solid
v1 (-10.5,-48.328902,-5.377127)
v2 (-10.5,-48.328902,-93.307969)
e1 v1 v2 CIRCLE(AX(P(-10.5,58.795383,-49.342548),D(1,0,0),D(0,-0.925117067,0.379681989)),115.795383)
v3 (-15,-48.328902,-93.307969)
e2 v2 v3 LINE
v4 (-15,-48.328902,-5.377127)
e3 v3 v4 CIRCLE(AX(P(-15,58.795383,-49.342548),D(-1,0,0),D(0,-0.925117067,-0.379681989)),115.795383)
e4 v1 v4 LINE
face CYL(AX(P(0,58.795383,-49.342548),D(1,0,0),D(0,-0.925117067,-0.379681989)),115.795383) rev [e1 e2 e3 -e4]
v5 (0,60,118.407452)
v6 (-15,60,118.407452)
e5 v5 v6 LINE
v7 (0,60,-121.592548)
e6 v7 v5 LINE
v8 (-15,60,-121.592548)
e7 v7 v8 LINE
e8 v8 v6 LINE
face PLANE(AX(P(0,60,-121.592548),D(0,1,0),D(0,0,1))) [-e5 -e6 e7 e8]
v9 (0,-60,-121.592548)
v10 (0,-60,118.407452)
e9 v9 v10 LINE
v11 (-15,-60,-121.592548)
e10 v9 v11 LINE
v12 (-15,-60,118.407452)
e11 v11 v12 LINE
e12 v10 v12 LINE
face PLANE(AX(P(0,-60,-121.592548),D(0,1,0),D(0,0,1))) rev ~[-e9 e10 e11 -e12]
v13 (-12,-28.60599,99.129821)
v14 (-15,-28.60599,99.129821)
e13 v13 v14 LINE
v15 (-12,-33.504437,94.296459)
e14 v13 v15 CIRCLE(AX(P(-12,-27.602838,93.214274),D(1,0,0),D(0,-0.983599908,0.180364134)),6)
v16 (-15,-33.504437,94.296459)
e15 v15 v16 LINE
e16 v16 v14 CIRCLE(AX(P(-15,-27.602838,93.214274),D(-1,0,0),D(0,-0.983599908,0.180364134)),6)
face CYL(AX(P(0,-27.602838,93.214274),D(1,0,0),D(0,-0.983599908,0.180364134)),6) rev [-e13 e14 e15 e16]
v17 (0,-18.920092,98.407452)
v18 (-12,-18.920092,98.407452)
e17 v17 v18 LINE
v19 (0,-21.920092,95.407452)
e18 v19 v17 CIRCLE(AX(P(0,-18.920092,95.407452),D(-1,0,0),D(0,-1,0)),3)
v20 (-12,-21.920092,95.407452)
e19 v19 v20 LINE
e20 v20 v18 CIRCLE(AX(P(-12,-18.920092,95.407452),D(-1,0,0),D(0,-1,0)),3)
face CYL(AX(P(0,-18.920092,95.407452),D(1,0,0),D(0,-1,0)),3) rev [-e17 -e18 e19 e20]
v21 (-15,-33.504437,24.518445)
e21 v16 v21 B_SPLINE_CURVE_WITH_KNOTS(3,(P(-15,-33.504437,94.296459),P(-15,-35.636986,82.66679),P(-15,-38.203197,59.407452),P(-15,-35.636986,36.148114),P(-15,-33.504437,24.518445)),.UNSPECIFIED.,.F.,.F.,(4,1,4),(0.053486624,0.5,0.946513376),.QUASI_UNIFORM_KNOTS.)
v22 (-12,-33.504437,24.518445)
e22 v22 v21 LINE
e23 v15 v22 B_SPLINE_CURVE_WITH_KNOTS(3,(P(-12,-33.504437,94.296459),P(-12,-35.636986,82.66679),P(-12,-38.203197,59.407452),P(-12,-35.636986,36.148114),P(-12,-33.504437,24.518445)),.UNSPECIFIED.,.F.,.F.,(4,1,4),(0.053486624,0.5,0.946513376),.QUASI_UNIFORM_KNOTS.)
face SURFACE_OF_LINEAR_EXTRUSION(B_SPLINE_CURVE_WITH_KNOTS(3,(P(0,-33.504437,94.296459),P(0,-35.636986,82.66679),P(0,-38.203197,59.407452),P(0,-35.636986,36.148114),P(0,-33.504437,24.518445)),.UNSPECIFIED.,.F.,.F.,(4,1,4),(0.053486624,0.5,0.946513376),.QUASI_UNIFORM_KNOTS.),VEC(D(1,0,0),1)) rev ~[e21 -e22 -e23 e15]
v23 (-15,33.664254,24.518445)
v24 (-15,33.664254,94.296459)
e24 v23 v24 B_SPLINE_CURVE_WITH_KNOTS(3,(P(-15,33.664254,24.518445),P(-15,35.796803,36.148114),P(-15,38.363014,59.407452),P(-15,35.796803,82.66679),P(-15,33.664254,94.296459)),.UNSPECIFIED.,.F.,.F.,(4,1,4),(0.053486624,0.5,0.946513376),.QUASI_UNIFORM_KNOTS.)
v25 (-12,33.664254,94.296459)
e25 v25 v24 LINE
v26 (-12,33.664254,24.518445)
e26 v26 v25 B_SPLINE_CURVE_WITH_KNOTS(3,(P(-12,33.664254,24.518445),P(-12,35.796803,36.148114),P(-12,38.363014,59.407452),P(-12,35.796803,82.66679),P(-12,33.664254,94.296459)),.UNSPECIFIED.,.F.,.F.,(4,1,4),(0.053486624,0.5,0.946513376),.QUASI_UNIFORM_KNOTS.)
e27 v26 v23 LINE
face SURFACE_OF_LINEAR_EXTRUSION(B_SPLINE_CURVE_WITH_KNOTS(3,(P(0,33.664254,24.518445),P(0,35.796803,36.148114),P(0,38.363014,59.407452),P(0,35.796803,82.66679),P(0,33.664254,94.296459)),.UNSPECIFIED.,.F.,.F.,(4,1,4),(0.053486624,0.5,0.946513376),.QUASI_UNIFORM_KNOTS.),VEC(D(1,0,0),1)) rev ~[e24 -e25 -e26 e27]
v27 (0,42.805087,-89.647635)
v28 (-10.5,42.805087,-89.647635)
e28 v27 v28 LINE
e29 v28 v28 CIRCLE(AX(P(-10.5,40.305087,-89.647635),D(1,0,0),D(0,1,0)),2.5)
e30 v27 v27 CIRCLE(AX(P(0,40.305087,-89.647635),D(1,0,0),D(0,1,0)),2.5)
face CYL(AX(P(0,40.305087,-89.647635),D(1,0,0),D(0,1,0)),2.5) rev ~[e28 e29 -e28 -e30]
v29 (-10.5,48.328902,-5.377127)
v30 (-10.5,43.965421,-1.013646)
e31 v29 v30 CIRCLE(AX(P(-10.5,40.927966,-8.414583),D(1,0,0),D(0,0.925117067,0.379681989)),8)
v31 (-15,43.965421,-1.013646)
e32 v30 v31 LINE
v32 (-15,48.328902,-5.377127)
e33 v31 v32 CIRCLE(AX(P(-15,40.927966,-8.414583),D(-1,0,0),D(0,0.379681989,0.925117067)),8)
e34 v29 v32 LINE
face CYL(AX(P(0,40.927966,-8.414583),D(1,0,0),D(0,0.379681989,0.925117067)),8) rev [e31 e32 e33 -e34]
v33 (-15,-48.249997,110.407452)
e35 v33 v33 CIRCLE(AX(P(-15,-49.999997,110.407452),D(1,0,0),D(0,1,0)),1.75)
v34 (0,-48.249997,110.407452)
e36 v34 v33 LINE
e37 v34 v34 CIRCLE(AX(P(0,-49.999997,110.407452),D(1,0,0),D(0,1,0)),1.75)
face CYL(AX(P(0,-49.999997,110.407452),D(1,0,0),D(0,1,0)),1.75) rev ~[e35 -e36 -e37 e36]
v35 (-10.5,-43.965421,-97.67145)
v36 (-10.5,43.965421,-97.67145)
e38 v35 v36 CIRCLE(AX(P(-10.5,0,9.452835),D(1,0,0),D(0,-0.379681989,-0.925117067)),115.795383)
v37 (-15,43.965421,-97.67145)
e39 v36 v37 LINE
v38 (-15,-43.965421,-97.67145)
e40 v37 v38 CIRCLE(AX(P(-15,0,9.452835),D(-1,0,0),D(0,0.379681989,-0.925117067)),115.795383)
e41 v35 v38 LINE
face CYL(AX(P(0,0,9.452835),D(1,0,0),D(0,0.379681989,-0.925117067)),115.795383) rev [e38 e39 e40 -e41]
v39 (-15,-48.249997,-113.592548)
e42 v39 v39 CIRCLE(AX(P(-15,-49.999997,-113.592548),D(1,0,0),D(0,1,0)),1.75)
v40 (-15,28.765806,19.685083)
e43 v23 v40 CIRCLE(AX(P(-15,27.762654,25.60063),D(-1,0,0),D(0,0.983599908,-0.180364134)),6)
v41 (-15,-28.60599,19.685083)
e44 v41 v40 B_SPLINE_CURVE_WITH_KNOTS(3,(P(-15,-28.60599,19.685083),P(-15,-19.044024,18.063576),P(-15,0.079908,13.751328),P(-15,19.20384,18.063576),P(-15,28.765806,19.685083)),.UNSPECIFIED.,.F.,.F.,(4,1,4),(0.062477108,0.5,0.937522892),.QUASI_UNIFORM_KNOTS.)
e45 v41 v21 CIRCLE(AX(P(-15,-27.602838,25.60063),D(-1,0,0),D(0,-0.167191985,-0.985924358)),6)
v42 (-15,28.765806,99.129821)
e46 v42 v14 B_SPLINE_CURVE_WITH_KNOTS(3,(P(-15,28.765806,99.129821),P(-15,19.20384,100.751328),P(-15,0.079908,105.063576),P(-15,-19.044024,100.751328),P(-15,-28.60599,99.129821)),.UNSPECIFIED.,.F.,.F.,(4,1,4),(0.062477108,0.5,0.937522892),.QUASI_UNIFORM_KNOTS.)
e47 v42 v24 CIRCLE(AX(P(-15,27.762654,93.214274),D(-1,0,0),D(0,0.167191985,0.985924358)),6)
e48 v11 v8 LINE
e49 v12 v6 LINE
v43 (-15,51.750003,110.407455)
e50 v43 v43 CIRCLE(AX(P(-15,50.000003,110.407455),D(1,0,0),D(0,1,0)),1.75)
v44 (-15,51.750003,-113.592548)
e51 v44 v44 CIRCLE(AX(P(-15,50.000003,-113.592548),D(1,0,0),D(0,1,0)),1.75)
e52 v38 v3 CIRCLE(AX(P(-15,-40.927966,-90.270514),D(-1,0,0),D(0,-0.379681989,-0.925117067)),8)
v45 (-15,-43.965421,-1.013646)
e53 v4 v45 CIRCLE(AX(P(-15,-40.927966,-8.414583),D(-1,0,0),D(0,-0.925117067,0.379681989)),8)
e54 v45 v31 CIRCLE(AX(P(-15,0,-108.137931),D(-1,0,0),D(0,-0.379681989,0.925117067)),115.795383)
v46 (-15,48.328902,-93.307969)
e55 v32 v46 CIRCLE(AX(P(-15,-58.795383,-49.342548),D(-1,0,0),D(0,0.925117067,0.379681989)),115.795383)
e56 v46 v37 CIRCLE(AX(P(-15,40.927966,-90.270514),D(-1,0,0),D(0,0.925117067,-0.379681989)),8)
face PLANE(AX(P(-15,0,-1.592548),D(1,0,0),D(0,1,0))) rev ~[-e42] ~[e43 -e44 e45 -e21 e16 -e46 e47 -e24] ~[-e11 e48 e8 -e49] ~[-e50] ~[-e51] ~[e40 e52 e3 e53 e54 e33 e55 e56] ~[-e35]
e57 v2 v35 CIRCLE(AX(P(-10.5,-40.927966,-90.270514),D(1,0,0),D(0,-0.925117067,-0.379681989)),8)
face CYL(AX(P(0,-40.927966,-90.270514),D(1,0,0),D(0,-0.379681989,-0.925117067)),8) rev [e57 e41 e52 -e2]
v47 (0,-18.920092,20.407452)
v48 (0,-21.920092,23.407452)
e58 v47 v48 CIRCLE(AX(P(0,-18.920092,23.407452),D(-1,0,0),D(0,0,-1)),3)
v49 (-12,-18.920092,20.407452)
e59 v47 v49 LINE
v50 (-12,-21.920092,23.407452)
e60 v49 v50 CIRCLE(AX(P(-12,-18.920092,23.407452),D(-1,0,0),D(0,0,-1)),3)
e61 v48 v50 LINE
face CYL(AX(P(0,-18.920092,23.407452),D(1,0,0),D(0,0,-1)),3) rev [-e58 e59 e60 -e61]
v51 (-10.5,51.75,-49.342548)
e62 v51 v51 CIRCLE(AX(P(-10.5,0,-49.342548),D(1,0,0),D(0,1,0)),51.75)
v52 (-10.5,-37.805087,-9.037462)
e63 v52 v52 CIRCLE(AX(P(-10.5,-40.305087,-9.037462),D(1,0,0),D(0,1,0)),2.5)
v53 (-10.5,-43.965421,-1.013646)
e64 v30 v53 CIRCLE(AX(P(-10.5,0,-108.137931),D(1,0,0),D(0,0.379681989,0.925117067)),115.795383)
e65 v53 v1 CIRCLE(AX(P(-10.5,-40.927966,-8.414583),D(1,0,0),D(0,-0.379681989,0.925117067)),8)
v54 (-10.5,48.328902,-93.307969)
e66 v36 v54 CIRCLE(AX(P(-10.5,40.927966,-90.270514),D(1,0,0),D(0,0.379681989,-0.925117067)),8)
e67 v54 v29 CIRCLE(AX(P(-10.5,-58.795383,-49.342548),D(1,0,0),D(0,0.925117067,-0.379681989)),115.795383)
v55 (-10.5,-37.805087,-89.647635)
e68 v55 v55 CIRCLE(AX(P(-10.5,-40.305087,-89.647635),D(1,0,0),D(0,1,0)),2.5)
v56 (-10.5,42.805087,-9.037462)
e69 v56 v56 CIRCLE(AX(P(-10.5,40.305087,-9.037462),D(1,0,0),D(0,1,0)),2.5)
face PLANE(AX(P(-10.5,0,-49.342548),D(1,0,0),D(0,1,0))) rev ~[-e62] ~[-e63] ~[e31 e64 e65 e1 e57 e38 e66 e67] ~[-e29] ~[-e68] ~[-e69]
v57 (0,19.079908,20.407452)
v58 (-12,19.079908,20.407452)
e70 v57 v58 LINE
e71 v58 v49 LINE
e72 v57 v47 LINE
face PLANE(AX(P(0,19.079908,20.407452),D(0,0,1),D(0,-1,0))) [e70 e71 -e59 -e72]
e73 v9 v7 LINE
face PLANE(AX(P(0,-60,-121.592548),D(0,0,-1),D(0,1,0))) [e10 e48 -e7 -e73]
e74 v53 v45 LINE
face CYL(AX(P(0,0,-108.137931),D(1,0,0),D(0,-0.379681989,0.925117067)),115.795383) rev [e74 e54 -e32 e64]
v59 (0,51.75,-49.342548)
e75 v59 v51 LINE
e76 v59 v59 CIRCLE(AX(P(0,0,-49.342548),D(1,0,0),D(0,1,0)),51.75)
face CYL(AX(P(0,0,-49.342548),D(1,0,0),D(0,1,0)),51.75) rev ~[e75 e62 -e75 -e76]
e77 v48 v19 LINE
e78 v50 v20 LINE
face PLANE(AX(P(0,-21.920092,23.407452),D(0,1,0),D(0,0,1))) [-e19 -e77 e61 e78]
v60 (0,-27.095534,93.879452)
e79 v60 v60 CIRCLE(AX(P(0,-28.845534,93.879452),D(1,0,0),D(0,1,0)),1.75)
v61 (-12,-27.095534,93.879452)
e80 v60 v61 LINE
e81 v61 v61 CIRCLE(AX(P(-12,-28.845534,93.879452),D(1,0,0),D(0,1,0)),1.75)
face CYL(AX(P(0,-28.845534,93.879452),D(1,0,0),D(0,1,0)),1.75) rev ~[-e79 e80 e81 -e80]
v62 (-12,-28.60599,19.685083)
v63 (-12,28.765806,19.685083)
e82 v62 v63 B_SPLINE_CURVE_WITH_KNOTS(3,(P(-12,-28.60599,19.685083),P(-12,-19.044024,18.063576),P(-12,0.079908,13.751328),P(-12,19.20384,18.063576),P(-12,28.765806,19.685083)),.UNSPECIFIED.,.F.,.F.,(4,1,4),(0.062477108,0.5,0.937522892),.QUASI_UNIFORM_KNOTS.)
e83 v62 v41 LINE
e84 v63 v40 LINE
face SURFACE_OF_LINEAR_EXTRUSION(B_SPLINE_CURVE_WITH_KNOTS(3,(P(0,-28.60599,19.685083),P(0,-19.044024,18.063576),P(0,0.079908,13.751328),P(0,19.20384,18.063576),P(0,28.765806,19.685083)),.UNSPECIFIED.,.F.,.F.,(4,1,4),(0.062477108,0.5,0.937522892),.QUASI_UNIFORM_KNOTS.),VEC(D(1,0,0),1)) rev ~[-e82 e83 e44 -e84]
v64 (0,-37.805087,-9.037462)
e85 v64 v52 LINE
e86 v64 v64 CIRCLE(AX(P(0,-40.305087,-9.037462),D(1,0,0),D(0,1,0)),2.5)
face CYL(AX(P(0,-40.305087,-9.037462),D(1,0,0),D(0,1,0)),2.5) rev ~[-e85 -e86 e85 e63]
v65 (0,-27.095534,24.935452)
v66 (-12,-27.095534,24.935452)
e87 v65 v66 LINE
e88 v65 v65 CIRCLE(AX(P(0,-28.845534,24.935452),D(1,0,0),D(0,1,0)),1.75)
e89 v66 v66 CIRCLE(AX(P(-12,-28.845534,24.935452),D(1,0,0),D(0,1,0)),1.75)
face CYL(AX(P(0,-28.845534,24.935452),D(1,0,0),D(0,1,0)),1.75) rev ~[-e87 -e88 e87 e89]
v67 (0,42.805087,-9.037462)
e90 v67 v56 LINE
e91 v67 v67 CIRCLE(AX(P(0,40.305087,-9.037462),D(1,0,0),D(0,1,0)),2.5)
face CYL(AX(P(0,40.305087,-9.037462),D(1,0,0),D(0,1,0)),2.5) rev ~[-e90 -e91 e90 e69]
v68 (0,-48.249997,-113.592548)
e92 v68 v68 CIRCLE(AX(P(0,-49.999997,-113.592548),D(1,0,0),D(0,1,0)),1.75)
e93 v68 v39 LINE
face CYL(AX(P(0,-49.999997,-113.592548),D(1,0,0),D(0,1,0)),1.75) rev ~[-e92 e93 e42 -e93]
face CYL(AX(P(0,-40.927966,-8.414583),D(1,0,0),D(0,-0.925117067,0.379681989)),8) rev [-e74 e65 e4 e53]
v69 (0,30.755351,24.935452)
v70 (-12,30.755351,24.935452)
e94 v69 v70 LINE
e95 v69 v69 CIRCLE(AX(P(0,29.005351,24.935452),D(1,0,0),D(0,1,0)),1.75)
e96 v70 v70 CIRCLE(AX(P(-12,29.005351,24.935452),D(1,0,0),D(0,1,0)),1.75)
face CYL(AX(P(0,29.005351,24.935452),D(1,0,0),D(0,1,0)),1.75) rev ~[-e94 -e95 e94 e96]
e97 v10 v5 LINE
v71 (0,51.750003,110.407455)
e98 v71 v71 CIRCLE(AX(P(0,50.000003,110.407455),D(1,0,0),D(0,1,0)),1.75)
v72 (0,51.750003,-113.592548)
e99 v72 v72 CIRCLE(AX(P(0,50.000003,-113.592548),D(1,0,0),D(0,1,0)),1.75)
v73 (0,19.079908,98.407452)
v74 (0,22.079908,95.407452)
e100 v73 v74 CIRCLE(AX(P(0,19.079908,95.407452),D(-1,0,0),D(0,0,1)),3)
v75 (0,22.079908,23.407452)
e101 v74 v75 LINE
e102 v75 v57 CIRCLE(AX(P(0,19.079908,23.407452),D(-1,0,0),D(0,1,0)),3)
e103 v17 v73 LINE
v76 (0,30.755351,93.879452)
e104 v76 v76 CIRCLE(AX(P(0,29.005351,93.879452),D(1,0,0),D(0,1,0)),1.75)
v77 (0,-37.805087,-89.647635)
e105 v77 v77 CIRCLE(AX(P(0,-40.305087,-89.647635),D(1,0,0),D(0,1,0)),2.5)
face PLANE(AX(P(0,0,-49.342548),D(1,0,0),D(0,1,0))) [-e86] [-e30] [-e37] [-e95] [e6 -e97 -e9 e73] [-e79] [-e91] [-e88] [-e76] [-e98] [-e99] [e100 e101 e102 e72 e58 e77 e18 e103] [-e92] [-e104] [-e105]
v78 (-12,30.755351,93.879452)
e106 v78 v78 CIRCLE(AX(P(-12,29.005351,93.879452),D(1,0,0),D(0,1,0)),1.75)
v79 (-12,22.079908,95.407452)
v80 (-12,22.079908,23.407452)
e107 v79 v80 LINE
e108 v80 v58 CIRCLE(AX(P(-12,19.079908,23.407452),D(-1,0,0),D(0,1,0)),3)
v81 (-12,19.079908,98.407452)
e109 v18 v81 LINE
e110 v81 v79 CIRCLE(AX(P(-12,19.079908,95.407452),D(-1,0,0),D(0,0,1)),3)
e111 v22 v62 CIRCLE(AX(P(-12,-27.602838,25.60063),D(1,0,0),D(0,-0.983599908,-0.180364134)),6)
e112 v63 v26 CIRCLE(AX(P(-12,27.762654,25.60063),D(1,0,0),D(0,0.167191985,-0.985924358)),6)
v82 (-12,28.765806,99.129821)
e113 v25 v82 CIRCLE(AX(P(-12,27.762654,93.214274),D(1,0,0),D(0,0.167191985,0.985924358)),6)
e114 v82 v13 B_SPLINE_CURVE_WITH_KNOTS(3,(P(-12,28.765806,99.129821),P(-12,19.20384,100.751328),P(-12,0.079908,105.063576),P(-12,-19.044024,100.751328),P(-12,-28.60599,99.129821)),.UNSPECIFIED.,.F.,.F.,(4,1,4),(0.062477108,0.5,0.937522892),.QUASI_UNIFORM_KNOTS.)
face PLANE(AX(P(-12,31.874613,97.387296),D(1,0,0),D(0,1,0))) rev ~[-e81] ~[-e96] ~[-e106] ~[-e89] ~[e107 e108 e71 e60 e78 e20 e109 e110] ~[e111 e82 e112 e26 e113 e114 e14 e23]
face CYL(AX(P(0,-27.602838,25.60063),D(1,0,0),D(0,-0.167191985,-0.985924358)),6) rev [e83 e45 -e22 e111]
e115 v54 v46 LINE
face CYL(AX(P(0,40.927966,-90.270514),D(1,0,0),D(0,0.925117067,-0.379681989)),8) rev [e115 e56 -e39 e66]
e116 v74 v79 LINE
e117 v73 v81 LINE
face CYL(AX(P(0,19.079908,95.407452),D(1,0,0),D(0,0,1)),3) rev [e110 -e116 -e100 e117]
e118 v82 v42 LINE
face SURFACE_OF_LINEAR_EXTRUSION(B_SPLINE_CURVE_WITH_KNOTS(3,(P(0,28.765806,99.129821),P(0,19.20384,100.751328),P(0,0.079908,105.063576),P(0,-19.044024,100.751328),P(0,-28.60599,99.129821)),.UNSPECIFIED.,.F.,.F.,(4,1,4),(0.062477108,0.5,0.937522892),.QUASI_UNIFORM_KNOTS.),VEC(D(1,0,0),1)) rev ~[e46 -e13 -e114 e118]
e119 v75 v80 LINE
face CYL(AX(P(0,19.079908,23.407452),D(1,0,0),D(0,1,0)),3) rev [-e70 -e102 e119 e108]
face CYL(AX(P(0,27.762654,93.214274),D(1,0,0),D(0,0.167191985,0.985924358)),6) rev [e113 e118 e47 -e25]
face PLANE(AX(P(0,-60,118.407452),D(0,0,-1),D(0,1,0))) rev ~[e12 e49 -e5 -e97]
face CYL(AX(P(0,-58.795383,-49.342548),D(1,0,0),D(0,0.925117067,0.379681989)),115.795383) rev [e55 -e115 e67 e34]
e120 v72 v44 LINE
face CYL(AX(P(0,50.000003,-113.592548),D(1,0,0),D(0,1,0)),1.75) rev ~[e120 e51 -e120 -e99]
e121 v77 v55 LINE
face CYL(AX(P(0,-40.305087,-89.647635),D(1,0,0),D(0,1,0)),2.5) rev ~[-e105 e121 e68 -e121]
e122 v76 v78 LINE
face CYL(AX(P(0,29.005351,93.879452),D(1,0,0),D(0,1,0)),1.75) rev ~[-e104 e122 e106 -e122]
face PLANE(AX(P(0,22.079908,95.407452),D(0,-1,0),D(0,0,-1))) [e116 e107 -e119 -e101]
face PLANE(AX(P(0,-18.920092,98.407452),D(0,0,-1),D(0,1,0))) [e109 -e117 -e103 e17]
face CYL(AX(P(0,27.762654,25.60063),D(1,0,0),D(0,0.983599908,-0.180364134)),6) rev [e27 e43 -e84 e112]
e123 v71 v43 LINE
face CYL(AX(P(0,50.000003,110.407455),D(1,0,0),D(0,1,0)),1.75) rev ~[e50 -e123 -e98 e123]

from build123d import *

# Parameters (mm, degrees)
F0_W     = 120
F0_H     = 240
F0_R     = 1.75
F1_DEPTH = 15
F2_DEPTH = 12
F0_R_2   = 2.5
F0_R_3   = 51.75
F3_DEPTH = 10.5


with BuildPart() as f1:
    # F0 (on Right) → F1 (new body)
    with BuildSketch(Plane.YZ):
        with Locations((0, -1.5925480289)):
            Rectangle(F0_W, F0_H)
        with Locations((-49.9999973178, -113.5925480289)):
            Circle(F0_R, mode=Mode.SUBTRACT)
        with BuildLine():
            ThreePointArc((-43.965421423, -1.0136459871), (0, 7.6574519711), (43.965421423, -1.0136459871))
            ThreePointArc((43.965421423, -1.0136459871), (46.5848197582, -2.7577282708), (48.3289020419, -5.377126606))
            ThreePointArc((48.3289020419, -5.377126606), (57, -49.3425480289), (48.3289020419, -93.3079694519))
            ThreePointArc((48.3289020419, -93.3079694519), (46.5848197582, -95.9273677871), (43.965421423, -97.6714500708))
            ThreePointArc((43.965421423, -97.6714500708), (0, -106.3425480289), (-43.965421423, -97.6714500708))
            ThreePointArc((-43.965421423, -97.6714500708), (-46.5848197582, -95.9273677871), (-48.3289020419, -93.3079694519))
            ThreePointArc((-48.3289020419, -93.3079694519), (-57, -49.3425480289), (-48.3289020419, -5.377126606))
            ThreePointArc((-48.3289020419, -5.377126606), (-46.5848197582, -2.7577282708), (-43.965421423, -1.0136459871))
        make_face(mode=Mode.SUBTRACT)
        with Locations((50.0000026822, -113.5925480289)):
            Circle(F0_R, mode=Mode.SUBTRACT)
        with Locations((-49.9999973178, 110.4074519711)):
            Circle(F0_R, mode=Mode.SUBTRACT)
        with BuildLine():
            add(Edge.make_bspline(
                [(32.8620764687, 98.4757185701), (31.4966530962, 98.6776279271), (30.1312297237, 98.8982735514), (28.7658063512, 99.1298205687)],
                knots=[0, 0, 0, 0, 0.0624771081, 0.0624771081, 0.0624771081, 0.0624771081], degree=3))
            add(Edge.make_bspline(
                [(33.6642538877, 94.2964592226), (33.4088016163, 95.6895456718), (33.1411606803, 97.082632121), (32.8620764687, 98.4757185701)],
                knots=[0.9465133763, 0.9465133763, 0.9465133763, 0.9465133763, 1, 1, 1, 1], degree=3))
            add(Edge.make_bspline(
                [(33.6642538877, 24.5184447195), (35.7968030814, 36.1481138033), (38.3630136679, 59.4074519711), (35.7968030814, 82.6667901388), (33.6642538877, 94.2964592226)],
                knots=[0.0534866237, 0.0534866237, 0.0534866237, 0.0534866237, 0.5, 0.9465133763, 0.9465133763, 0.9465133763, 0.9465133763], degree=3))
            add(Edge.make_bspline(
                [(32.8620764687, 20.339185372), (33.1411606803, 21.7322718212), (33.4088016163, 23.1253582703), (33.6642538877, 24.5184447195)],
                knots=[0, 0, 0, 0, 0.0534866237, 0.0534866237, 0.0534866237, 0.0534866237], degree=3))
            add(Edge.make_bspline(
                [(28.7658063512, 19.6850833734), (30.1312297237, 19.9166303908), (31.4966530962, 20.1372760151), (32.8620764687, 20.339185372)],
                knots=[0.9375228919, 0.9375228919, 0.9375228919, 0.9375228919, 1, 1, 1, 1], degree=3))
            add(Edge.make_bspline(
                [(-28.6059896019, 19.6850833734), (-19.0440236097, 18.0635755317), (0.0799083746, 13.7513284104), (19.203840359, 18.0635755317), (28.7658063512, 19.6850833734)],
                knots=[0.0624771081, 0.0624771081, 0.0624771081, 0.0624771081, 0.5, 0.9375228919, 0.9375228919, 0.9375228919, 0.9375228919], degree=3))
            add(Edge.make_bspline(
                [(-32.7022597194, 20.339185372), (-31.3368363469, 20.1372760151), (-29.9714129744, 19.9166303908), (-28.6059896019, 19.6850833734)],
                knots=[0, 0, 0, 0, 0.0624771081, 0.0624771081, 0.0624771081, 0.0624771081], degree=3))
            add(Edge.make_bspline(
                [(-33.5044371384, 24.5184447195), (-33.248984867, 23.1253582703), (-32.981343931, 21.7322718212), (-32.7022597194, 20.339185372)],
                knots=[0.9465133763, 0.9465133763, 0.9465133763, 0.9465133763, 1, 1, 1, 1], degree=3))
            add(Edge.make_bspline(
                [(-33.5044371384, 94.2964592226), (-35.6369863321, 82.6667901388), (-38.2031969186, 59.4074519711), (-35.6369863321, 36.1481138033), (-33.5044371384, 24.5184447195)],
                knots=[0.0534866237, 0.0534866237, 0.0534866237, 0.0534866237, 0.5, 0.9465133763, 0.9465133763, 0.9465133763, 0.9465133763], degree=3))
            add(Edge.make_bspline(
                [(-32.7022597194, 98.4757185701), (-32.981343931, 97.082632121), (-33.248984867, 95.6895456718), (-33.5044371384, 94.2964592226)],
                knots=[0, 0, 0, 0, 0.0534866237, 0.0534866237, 0.0534866237, 0.0534866237], degree=3))
            add(Edge.make_bspline(
                [(-28.6059896019, 99.1298205687), (-29.9714129744, 98.8982735514), (-31.3368363469, 98.6776279271), (-32.7022597194, 98.4757185701)],
                knots=[0.9375228919, 0.9375228919, 0.9375228919, 0.9375228919, 1, 1, 1, 1], degree=3))
            add(Edge.make_bspline(
                [(28.7658063512, 99.1298205687), (19.203840359, 100.7513284104), (0.0799083746, 105.0635755317), (-19.0440236097, 100.7513284104), (-28.6059896019, 99.1298205687)],
                knots=[0.0624771081, 0.0624771081, 0.0624771081, 0.0624771081, 0.5, 0.9375228919, 0.9375228919, 0.9375228919, 0.9375228919], degree=3))
        make_face(mode=Mode.SUBTRACT)
        with Locations((50.0000026822, 110.4074554281)):
            Circle(F0_R, mode=Mode.SUBTRACT)
        with BuildLine():
            add(Edge.make_bspline(
                [(33.6642538877, 94.2964592226), (33.4088016163, 95.6895456718), (33.1411606803, 97.082632121), (32.8620764687, 98.4757185701)],
                knots=[0.9465133763, 0.9465133763, 0.9465133763, 0.9465133763, 1, 1, 1, 1], degree=3))
            add(Edge.make_bspline(
                [(32.8620764687, 98.4757185701), (31.4966530962, 98.6776279271), (30.1312297237, 98.8982735514), (28.7658063512, 99.1298205687)],
                knots=[0, 0, 0, 0, 0.0624771081, 0.0624771081, 0.0624771081, 0.0624771081], degree=3))
            ThreePointArc((28.7658063512, 99.1298205687), (31.9768261624, 97.4851943073), (33.6642538877, 94.2964592226))
        make_face()
        with BuildLine():
            ThreePointArc((-33.5044371384, 94.2964592226), (-31.8170094131, 97.4851943073), (-28.6059896019, 99.1298205687))
            add(Edge.make_bspline(
                [(-28.6059896019, 99.1298205687), (-29.9714129744, 98.8982735514), (-31.3368363469, 98.6776279271), (-32.7022597194, 98.4757185701)],
                knots=[0.9375228919, 0.9375228919, 0.9375228919, 0.9375228919, 1, 1, 1, 1], degree=3))
            add(Edge.make_bspline(
                [(-32.7022597194, 98.4757185701), (-32.981343931, 97.082632121), (-33.248984867, 95.6895456718), (-33.5044371384, 94.2964592226)],
                knots=[0, 0, 0, 0, 0.0534866237, 0.0534866237, 0.0534866237, 0.0534866237], degree=3))
        make_face()
        with BuildLine():
            add(Edge.make_bspline(
                [(32.8620764687, 20.339185372), (33.1411606803, 21.7322718212), (33.4088016163, 23.1253582703), (33.6642538877, 24.5184447195)],
                knots=[0, 0, 0, 0, 0.0534866237, 0.0534866237, 0.0534866237, 0.0534866237], degree=3))
            ThreePointArc((33.6642538877, 24.5184447195), (31.9768261624, 21.3297096348), (28.7658063512, 19.6850833734))
            add(Edge.make_bspline(
                [(28.7658063512, 19.6850833734), (30.1312297237, 19.9166303908), (31.4966530962, 20.1372760151), (32.8620764687, 20.339185372)],
                knots=[0.9375228919, 0.9375228919, 0.9375228919, 0.9375228919, 1, 1, 1, 1], degree=3))
        make_face()
        with BuildLine():
            ThreePointArc((-28.6059896019, 19.6850833734), (-31.8170094131, 21.3297096348), (-33.5044371384, 24.5184447195))
            add(Edge.make_bspline(
                [(-33.5044371384, 24.5184447195), (-33.248984867, 23.1253582703), (-32.981343931, 21.7322718212), (-32.7022597194, 20.339185372)],
                knots=[0.9465133763, 0.9465133763, 0.9465133763, 0.9465133763, 1, 1, 1, 1], degree=3))
            add(Edge.make_bspline(
                [(-32.7022597194, 20.339185372), (-31.3368363469, 20.1372760151), (-29.9714129744, 19.9166303908), (-28.6059896019, 19.6850833734)],
                knots=[0, 0, 0, 0, 0.0624771081, 0.0624771081, 0.0624771081, 0.0624771081], degree=3))
        make_face()
    extrude(amount=-F1_DEPTH)

    # F0 (on Right) → F2 (join)
    with BuildSketch(Plane.YZ):
        with BuildLine():
            add(Edge.make_bspline(
                [(33.6642538877, 94.2964592226), (33.4088016163, 95.6895456718), (33.1411606803, 97.082632121), (32.8620764687, 98.4757185701)],
                knots=[0.9465133763, 0.9465133763, 0.9465133763, 0.9465133763, 1, 1, 1, 1], degree=3))
            add(Edge.make_bspline(
                [(32.8620764687, 98.4757185701), (31.4966530962, 98.6776279271), (30.1312297237, 98.8982735514), (28.7658063512, 99.1298205687)],
                knots=[0, 0, 0, 0, 0.0624771081, 0.0624771081, 0.0624771081, 0.0624771081], degree=3))
            ThreePointArc((28.7658063512, 99.1298205687), (31.9768261624, 97.4851943073), (33.6642538877, 94.2964592226))
        make_face()
        with BuildLine():
            ThreePointArc((33.6642538877, 94.2964592226), (31.9768261624, 97.4851943073), (28.7658063512, 99.1298205687))
            add(Edge.make_bspline(
                [(28.7658063512, 99.1298205687), (19.203840359, 100.7513284104), (0.0799083746, 105.0635755317), (-19.0440236097, 100.7513284104), (-28.6059896019, 99.1298205687)],
                knots=[0.0624771081, 0.0624771081, 0.0624771081, 0.0624771081, 0.5, 0.9375228919, 0.9375228919, 0.9375228919, 0.9375228919], degree=3))
            ThreePointArc((-28.6059896019, 99.1298205687), (-31.8170094131, 97.4851943073), (-33.5044371384, 94.2964592226))
            add(Edge.make_bspline(
                [(-33.5044371384, 94.2964592226), (-35.6369863321, 82.6667901388), (-38.2031969186, 59.4074519711), (-35.6369863321, 36.1481138033), (-33.5044371384, 24.5184447195)],
                knots=[0.0534866237, 0.0534866237, 0.0534866237, 0.0534866237, 0.5, 0.9465133763, 0.9465133763, 0.9465133763, 0.9465133763], degree=3))
            ThreePointArc((-33.5044371384, 24.5184447195), (-31.8170094131, 21.3297096348), (-28.6059896019, 19.6850833734))
            add(Edge.make_bspline(
                [(-28.6059896019, 19.6850833734), (-19.0440236097, 18.0635755317), (0.0799083746, 13.7513284104), (19.203840359, 18.0635755317), (28.7658063512, 19.6850833734)],
                knots=[0.0624771081, 0.0624771081, 0.0624771081, 0.0624771081, 0.5, 0.9375228919, 0.9375228919, 0.9375228919, 0.9375228919], degree=3))
            ThreePointArc((28.7658063512, 19.6850833734), (31.9768261624, 21.3297096348), (33.6642538877, 24.5184447195))
            add(Edge.make_bspline(
                [(33.6642538877, 24.5184447195), (35.7968030814, 36.1481138033), (38.3630136679, 59.4074519711), (35.7968030814, 82.6667901388), (33.6642538877, 94.2964592226)],
                knots=[0.0534866237, 0.0534866237, 0.0534866237, 0.0534866237, 0.5, 0.9465133763, 0.9465133763, 0.9465133763, 0.9465133763], degree=3))
        make_face()
        with Locations((-28.8455340613, 24.9354520307)):
            Circle(F0_R, mode=Mode.SUBTRACT)
        with Locations((-28.8455340613, 93.8794519114)):
            Circle(F0_R, mode=Mode.SUBTRACT)
        with Locations((29.0053508105, 24.9354520307)):
            Circle(F0_R, mode=Mode.SUBTRACT)
        with BuildLine():
            Line((-18.9200916254, 98.4074519711), (19.0799083746, 98.4074519711))
            ThreePointArc((19.0799083746, 98.4074519711), (21.2012287182, 97.5287723146), (22.0799083746, 95.4074519711))
            Line((22.0799083746, 95.4074519711), (22.0799083746, 23.4074519711))
            ThreePointArc((22.0799083746, 23.4074519711), (21.2012287182, 21.2861316275), (19.0799083746, 20.4074519711))
            Line((19.0799083746, 20.4074519711), (-18.9200916254, 20.4074519711))
            ThreePointArc((-18.9200916254, 20.4074519711), (-21.0414119689, 21.2861316275), (-21.9200916254, 23.4074519711))
            Line((-21.9200916254, 23.4074519711), (-21.9200916254, 95.4074519711))
            ThreePointArc((-21.9200916254, 95.4074519711), (-21.0414119689, 97.5287723146), (-18.9200916254, 98.4074519711))
        make_face(mode=Mode.SUBTRACT)
        with Locations((29.0053508105, 93.8794519114)):
            Circle(F0_R, mode=Mode.SUBTRACT)
        with BuildLine():
            ThreePointArc((-33.5044371384, 94.2964592226), (-31.8170094131, 97.4851943073), (-28.6059896019, 99.1298205687))
            add(Edge.make_bspline(
                [(-28.6059896019, 99.1298205687), (-29.9714129744, 98.8982735514), (-31.3368363469, 98.6776279271), (-32.7022597194, 98.4757185701)],
                knots=[0.9375228919, 0.9375228919, 0.9375228919, 0.9375228919, 1, 1, 1, 1], degree=3))
            add(Edge.make_bspline(
                [(-32.7022597194, 98.4757185701), (-32.981343931, 97.082632121), (-33.248984867, 95.6895456718), (-33.5044371384, 94.2964592226)],
                knots=[0, 0, 0, 0, 0.0534866237, 0.0534866237, 0.0534866237, 0.0534866237], degree=3))
        make_face()
    extrude(amount=-F2_DEPTH)

    # F0 (on Right) → F3 (join)
    with BuildSketch(Plane.YZ):
        with BuildLine():
            ThreePointArc((48.3289020419, -5.377126606), (46.5848197582, -2.7577282708), (43.965421423, -1.0136459871))
            ThreePointArc((43.965421423, -1.0136459871), (0, 7.6574519711), (-43.965421423, -1.0136459871))
            ThreePointArc((-43.965421423, -1.0136459871), (-46.5848197582, -2.7577282708), (-48.3289020419, -5.377126606))
            ThreePointArc((-48.3289020419, -5.377126606), (-57, -49.3425480289), (-48.3289020419, -93.3079694519))
            ThreePointArc((-48.3289020419, -93.3079694519), (-46.5848197582, -95.9273677871), (-43.965421423, -97.6714500708))
            ThreePointArc((-43.965421423, -97.6714500708), (0, -106.3425480289), (43.965421423, -97.6714500708))
            ThreePointArc((43.965421423, -97.6714500708), (46.5848197582, -95.9273677871), (48.3289020419, -93.3079694519))
            ThreePointArc((48.3289020419, -93.3079694519), (57, -49.3425480289), (48.3289020419, -5.377126606))
        make_face()
        with Locations((-40.3050865276, -89.6476345566)):
            Circle(F0_R_2, mode=Mode.SUBTRACT)
        with Locations((-40.3050865276, -9.0374615013)):
            Circle(F0_R_2, mode=Mode.SUBTRACT)
        with Locations((40.3050865276, -89.6476345566)):
            Circle(F0_R_2, mode=Mode.SUBTRACT)
        with Locations((0, -49.3425480289)):
            Circle(F0_R_3, mode=Mode.SUBTRACT)
        with Locations((40.3050865276, -9.0374615013)):
            Circle(F0_R_2, mode=Mode.SUBTRACT)
    extrude(amount=-F3_DEPTH)


solid = f1.part
